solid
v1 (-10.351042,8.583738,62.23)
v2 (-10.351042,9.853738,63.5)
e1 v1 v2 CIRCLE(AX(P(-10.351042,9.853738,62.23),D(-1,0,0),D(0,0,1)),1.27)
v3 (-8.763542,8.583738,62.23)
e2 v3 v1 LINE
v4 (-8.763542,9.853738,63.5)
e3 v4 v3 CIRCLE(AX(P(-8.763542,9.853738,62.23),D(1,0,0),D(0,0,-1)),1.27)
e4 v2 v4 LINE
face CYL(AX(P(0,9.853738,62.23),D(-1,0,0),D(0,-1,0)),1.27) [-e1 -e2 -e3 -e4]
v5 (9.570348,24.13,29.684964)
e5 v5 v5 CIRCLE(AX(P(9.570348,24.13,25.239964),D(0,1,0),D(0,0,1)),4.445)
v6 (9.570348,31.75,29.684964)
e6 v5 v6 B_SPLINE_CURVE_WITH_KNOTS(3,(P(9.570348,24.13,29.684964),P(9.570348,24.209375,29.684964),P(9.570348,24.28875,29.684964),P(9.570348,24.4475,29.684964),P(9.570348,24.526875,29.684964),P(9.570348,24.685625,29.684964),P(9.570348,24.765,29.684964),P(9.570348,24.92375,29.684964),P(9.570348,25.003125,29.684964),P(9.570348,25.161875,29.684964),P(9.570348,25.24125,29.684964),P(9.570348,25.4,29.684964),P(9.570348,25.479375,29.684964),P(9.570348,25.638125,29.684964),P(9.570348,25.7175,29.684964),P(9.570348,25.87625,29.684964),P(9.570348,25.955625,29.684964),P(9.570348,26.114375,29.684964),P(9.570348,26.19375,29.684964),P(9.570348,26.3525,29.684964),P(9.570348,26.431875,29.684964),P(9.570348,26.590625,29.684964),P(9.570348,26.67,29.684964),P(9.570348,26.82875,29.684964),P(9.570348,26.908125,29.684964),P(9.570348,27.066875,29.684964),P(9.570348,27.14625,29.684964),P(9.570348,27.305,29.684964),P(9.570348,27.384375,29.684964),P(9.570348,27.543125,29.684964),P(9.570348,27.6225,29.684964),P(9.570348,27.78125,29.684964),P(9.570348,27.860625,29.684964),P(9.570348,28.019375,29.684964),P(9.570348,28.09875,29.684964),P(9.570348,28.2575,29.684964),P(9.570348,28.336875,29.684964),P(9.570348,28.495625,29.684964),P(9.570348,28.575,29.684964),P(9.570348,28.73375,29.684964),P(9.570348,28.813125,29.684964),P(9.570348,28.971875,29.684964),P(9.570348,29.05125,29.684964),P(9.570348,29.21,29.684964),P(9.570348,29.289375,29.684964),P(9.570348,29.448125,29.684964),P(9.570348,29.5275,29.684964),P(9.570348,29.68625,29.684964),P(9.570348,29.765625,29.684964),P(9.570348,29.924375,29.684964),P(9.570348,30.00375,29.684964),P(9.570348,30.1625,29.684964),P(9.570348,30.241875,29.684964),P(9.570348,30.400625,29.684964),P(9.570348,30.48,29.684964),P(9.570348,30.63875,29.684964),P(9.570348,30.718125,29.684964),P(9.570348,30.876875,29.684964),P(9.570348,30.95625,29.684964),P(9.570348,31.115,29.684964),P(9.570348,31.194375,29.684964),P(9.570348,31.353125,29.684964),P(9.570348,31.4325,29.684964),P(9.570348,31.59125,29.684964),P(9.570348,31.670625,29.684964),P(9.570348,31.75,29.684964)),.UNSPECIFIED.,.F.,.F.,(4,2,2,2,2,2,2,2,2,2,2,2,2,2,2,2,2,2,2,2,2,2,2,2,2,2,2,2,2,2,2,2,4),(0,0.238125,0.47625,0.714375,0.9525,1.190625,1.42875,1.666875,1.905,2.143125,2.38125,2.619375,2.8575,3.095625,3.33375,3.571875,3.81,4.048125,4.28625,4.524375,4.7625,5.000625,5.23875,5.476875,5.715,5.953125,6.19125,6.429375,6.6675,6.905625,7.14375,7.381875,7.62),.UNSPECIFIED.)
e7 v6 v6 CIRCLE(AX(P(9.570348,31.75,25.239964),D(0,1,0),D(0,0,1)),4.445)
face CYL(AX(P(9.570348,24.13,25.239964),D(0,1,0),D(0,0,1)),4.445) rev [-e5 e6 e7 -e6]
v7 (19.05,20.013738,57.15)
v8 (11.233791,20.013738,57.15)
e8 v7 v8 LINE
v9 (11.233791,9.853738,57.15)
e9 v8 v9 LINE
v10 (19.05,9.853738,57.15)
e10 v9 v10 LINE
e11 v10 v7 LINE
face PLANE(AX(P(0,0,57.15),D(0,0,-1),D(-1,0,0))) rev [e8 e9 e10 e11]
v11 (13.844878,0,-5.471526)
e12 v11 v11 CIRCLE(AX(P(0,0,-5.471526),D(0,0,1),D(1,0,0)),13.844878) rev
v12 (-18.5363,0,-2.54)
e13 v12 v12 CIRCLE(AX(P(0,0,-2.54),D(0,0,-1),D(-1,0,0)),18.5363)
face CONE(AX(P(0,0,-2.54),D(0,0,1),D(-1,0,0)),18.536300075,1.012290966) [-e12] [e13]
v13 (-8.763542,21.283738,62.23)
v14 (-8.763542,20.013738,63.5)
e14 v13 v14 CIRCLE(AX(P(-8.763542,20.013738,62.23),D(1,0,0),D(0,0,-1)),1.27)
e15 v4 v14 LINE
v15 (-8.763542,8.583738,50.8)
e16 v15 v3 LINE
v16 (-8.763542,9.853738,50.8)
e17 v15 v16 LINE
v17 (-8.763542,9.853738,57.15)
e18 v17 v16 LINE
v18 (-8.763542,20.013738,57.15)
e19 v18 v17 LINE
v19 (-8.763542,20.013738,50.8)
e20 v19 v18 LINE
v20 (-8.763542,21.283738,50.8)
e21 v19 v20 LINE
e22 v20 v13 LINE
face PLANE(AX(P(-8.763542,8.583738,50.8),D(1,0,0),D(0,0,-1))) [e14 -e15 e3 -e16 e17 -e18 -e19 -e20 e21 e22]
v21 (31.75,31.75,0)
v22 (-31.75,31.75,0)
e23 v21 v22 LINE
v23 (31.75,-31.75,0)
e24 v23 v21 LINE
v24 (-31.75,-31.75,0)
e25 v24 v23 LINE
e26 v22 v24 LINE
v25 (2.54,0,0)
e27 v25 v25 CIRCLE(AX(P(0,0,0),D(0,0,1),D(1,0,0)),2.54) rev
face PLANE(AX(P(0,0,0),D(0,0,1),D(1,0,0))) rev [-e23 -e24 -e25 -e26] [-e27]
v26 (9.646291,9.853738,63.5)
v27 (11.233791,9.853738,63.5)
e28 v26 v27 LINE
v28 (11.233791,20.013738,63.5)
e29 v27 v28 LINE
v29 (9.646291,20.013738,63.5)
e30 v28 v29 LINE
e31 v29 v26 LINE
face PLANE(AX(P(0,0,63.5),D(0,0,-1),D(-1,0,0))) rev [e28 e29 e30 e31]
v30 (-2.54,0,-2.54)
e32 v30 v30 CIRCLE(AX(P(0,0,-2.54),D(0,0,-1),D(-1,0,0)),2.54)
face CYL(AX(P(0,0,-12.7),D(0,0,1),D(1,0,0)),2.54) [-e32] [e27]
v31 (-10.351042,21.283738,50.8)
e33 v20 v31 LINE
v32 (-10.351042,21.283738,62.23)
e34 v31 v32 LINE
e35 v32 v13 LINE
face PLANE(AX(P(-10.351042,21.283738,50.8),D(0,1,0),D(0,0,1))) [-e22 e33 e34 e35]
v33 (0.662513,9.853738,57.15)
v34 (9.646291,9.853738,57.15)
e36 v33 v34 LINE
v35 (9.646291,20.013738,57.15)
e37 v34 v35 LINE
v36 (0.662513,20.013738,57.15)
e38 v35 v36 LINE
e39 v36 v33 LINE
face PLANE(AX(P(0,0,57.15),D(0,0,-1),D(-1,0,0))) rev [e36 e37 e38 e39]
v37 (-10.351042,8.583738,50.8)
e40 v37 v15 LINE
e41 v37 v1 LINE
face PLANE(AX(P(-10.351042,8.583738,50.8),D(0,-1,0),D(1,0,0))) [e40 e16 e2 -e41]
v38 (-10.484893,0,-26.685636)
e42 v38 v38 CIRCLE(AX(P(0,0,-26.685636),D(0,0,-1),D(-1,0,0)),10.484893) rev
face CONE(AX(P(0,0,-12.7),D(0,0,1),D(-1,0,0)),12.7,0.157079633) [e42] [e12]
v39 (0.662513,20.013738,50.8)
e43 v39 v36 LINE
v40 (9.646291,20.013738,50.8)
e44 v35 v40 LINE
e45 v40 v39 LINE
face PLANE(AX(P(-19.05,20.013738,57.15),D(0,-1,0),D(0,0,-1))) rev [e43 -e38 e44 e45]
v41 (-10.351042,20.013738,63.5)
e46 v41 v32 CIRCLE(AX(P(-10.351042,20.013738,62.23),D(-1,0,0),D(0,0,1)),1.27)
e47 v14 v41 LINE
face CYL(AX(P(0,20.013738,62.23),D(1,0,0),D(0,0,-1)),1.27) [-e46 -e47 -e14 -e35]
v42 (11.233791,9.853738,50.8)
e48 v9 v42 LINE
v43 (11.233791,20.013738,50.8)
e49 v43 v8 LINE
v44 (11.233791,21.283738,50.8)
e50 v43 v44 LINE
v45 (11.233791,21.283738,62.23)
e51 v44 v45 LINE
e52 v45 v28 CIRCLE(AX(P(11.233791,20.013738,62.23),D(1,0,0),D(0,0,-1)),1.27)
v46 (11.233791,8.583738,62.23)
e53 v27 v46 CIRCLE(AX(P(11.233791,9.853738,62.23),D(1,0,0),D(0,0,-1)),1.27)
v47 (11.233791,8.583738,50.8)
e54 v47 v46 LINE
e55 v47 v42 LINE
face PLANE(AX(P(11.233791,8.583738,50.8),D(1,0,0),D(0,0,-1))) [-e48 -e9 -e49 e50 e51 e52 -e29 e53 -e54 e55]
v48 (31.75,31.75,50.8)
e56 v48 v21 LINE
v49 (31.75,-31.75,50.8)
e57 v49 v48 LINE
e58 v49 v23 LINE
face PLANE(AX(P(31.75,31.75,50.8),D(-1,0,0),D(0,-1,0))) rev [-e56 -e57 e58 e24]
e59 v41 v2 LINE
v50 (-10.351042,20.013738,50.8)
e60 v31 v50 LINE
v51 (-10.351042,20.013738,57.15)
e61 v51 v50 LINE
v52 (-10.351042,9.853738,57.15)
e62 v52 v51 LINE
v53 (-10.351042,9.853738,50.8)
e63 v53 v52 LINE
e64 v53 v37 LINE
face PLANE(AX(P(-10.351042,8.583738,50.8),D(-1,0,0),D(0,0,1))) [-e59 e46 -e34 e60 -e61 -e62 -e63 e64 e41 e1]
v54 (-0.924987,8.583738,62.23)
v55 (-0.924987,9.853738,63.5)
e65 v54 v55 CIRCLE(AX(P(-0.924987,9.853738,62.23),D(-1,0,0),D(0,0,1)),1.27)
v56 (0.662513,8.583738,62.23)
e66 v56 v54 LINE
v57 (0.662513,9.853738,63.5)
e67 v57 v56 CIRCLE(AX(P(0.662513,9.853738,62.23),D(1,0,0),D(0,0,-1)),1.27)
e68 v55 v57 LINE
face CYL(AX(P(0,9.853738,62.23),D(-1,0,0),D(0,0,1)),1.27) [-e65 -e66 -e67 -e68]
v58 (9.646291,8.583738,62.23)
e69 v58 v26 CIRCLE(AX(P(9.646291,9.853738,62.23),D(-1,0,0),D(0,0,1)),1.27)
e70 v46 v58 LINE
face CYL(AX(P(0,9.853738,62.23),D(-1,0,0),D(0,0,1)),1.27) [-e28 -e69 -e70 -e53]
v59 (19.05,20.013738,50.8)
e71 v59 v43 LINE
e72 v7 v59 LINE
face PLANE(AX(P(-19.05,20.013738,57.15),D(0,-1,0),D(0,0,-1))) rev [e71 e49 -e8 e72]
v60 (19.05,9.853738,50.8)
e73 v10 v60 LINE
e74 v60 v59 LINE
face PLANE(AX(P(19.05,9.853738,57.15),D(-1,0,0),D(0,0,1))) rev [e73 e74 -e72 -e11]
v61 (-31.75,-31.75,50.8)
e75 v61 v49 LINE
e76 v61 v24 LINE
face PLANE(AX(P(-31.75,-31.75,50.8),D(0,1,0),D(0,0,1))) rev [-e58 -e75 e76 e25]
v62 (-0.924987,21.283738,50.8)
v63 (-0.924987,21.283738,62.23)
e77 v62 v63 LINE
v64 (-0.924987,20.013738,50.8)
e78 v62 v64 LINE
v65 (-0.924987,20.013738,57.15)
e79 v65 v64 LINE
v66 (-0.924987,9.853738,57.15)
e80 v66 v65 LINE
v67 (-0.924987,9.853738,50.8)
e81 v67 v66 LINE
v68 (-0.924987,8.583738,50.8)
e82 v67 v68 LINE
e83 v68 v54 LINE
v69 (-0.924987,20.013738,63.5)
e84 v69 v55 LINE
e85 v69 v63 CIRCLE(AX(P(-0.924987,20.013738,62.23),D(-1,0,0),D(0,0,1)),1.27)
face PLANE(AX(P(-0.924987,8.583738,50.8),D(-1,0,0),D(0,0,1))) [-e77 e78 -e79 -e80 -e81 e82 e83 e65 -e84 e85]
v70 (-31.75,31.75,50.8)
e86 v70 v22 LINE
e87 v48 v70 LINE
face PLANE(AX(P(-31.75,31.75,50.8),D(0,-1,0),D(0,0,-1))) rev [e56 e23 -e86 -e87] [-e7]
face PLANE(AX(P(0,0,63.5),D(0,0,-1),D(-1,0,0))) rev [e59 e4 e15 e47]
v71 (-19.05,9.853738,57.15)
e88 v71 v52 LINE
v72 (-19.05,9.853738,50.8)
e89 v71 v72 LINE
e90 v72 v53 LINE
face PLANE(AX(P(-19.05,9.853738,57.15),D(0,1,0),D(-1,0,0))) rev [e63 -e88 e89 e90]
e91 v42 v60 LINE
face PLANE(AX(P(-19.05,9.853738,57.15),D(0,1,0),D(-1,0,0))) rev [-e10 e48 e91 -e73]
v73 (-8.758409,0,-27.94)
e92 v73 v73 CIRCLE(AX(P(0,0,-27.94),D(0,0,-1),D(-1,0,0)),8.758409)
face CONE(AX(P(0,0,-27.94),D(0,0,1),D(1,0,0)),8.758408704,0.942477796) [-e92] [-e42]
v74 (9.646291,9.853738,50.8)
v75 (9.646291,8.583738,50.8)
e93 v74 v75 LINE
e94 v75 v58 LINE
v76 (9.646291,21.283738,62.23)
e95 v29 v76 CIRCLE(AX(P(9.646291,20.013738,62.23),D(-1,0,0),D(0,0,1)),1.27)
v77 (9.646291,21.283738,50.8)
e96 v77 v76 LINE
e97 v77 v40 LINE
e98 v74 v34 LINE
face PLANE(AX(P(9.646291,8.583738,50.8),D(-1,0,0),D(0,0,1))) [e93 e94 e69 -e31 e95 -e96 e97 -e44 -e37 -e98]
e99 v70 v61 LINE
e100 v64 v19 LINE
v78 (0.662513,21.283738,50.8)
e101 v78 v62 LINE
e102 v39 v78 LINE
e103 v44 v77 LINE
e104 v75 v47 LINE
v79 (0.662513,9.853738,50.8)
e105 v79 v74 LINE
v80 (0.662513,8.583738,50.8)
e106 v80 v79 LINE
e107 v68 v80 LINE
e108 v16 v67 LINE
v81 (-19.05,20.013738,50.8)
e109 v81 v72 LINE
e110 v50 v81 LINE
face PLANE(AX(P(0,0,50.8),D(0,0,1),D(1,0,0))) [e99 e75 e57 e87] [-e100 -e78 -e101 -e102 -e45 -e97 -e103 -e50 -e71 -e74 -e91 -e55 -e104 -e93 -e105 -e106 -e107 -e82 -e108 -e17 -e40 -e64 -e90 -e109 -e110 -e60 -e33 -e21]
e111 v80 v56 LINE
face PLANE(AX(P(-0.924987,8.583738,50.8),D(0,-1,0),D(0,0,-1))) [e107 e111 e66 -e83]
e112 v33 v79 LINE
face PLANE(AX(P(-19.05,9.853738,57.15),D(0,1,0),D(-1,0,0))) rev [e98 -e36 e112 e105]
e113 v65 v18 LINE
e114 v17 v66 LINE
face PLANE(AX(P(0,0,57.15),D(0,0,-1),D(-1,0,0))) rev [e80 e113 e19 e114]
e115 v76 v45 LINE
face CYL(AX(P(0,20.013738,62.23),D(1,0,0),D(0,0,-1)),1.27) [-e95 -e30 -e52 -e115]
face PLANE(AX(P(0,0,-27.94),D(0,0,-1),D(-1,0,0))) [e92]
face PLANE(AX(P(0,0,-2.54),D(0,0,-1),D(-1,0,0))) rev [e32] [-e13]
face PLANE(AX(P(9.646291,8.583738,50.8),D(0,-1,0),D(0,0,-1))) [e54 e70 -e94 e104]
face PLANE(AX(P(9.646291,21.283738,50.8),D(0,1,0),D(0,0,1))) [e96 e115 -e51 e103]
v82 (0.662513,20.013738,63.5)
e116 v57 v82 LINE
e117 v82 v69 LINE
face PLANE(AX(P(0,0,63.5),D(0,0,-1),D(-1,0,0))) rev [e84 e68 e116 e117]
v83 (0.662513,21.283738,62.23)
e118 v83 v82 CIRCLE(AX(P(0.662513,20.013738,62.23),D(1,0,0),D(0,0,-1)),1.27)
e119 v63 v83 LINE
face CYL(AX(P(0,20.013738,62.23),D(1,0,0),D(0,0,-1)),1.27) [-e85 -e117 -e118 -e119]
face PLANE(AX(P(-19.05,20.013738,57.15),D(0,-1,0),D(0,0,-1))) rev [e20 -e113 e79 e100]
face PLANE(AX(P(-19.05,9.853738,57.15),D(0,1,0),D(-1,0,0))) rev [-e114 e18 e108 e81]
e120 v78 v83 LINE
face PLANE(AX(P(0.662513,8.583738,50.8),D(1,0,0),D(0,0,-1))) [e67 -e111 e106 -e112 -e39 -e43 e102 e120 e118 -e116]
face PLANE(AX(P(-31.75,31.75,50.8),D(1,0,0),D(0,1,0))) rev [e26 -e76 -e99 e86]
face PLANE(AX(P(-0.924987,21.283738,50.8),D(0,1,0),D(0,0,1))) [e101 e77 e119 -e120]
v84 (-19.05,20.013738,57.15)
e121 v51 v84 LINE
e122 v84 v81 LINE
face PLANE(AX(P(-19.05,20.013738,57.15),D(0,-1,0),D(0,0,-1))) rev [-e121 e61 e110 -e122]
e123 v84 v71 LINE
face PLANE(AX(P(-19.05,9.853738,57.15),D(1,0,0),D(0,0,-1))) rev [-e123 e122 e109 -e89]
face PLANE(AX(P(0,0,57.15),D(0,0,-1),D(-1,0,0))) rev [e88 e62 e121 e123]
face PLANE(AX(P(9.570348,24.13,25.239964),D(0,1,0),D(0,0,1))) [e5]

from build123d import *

# Parameters (mm, degrees)
SKETCH1_W                     = 63.5
SKETCH1_H                     = 63.5
BOSS_EXTRUDE1_DEPTH           = 50.8
SKETCH2_R                     = 2.54
BOSS_EXTRUDE2_DEPTH           = 12.7
SKETCH3_R                     = 12.7
BOSS_EXTRUDE3_DEPTH           = 15.24
BOSS_EXTRUDE3_TAPER           = 9
BOSS_EXTRUDE3_OTHER_WAY_DEPTH = 10.16
BOSS_EXTRUDE3_OTHER_WAY_TAPER = -9
BOSS_EXTRUDE4_START           = -25.4
SKETCH4_R                     = 18.536300075
BOSS_EXTRUDE4_DEPTH           = 3.175
BOSS_EXTRUDE4_TAPER           = 58
CHAMFER1_SIZE                 = 1.27
CHAMFER1_SIZE_2               = 1.527812426
SKETCH6_W                     = 38.1
SKETCH6_H                     = 10.16
BOSS_EXTRUDE6_DEPTH           = 6.35
BOSS_EXTRUDE7_DEPTH           = 6.35
BOSS_EXTRUDE7_DEPTH_BACK      = 6.35
SKETCH7_W                     = 1.5875
SKETCH7_H                     = 12.7
FILLET1_R                     = 1.27
SKETCH8_R                     = 4.445
CUT_EXTRUDE1_DEPTH            = 7.62


with BuildPart() as part:
    # Sketch1 → Boss-Extrude1 (new body)
    with BuildSketch(Plane.XY):
        Rectangle(SKETCH1_W, SKETCH1_H)
    extrude(amount=BOSS_EXTRUDE1_DEPTH)

    # Sketch2 → Boss-Extrude2 (add)
    with BuildSketch(Plane(origin=(0, 0, 0), x_dir=(-1, 0, 0), z_dir=(0, 0, -1))):
        with Locations(Location((0, 0, 0), (0, 0, 180))):
            Circle(SKETCH2_R)
    extrude(amount=BOSS_EXTRUDE2_DEPTH)

    # Sketch3 → Boss-Extrude3 (add)
    with BuildSketch(Plane(origin=(0, 0, -12.7), x_dir=(-1, 0, 0), z_dir=(0, 0, -1))):
        Circle(SKETCH3_R)
    extrude(amount=BOSS_EXTRUDE3_DEPTH, taper=BOSS_EXTRUDE3_TAPER)

    # Sketch3 → Boss-Extrude3 other way (add)
    with BuildSketch(Plane(origin=(0, 0, -12.7), x_dir=(-1, 0, 0), z_dir=(0, 0, -1))):
        Circle(SKETCH3_R)
    extrude(amount=-BOSS_EXTRUDE3_OTHER_WAY_DEPTH, taper=BOSS_EXTRUDE3_OTHER_WAY_TAPER)

    # Sketch4 → Boss-Extrude4 (add)
    with BuildSketch(Plane(origin=(0, 0, -27.94), x_dir=(-1, 0, 0), z_dir=(0, 0, -1)).offset(BOSS_EXTRUDE4_START)):
        Circle(SKETCH4_R)
    extrude(amount=BOSS_EXTRUDE4_DEPTH, taper=BOSS_EXTRUDE4_TAPER)

    # Chamfer1
    # the kernel refuses this chamfer: 1.527812426, 1.27 mm, written as the material it takes off along each edge
    with BuildSketch(Plane(origin=(0, 0, -27.94), x_dir=(-1, 0, 0), z_dir=(0, 1, 0))) as chamfer1_piece_1:
        Polygon((10.286221129 + CHAMFER1_SIZE * 0.15643446504, CHAMFER1_SIZE * 0.987688340595), (10.286221129 - CHAMFER1_SIZE_2, 0), (10.286221129, 0), align=None)
    revolve(axis=Axis((0, 0, -27.94), (0, 0, 1)), mode=Mode.SUBTRACT)

    # Sketch6 → Boss-Extrude6 (add)
    with BuildSketch(Plane.XY.offset(50.8)):
        with Locations((0, 14.933737581)):
            Rectangle(SKETCH6_W, SKETCH6_H)
    extrude(amount=BOSS_EXTRUDE6_DEPTH)

    # Sketch7 → Boss-Extrude7 (add, two sides: drawn at the far end of the back side and taken through both)
    with BuildSketch(Plane.XY.offset(57.15).offset(-BOSS_EXTRUDE7_DEPTH_BACK)):
        with Locations((-9.557292348, 14.933737581)):
            Rectangle(SKETCH7_W, SKETCH7_H)
        with Locations((-0.131236763, 14.933737581)):
            Rectangle(SKETCH7_W, SKETCH7_H)
        with Locations((10.440040529, 14.933737581)):
            Rectangle(SKETCH7_W, SKETCH7_H)
    extrude(amount=BOSS_EXTRUDE7_DEPTH + BOSS_EXTRUDE7_DEPTH_BACK)

    # Fillet1
    fillet1_edges = [part.edges().sort_by_distance(p)[0] for p in [
        (10.440040529, 21.283737581, 63.5),
        (10.440040529, 8.583737581, 63.5),
        (-0.131236763, 21.283737581, 63.5),
        (-0.131236763, 8.583737581, 63.5),
        (-9.557292348, 21.283737581, 63.5),
        (-9.557292348, 8.583737581, 63.5),
    ]]
    fillet(fillet1_edges, radius=FILLET1_R)

    # Sketch8 → Cut-Extrude1 (cut)
    with BuildSketch(Plane(origin=(0, 31.75, 0), x_dir=(1, 0, 0), z_dir=(0, 1, 0))):
        with Locations(Location((9.570348057, -25.239963614, 0), (0, 0, 270))):
            Circle(SKETCH8_R)
    extrude(amount=-CUT_EXTRUDE1_DEPTH, mode=Mode.SUBTRACT)


solid = part.part
